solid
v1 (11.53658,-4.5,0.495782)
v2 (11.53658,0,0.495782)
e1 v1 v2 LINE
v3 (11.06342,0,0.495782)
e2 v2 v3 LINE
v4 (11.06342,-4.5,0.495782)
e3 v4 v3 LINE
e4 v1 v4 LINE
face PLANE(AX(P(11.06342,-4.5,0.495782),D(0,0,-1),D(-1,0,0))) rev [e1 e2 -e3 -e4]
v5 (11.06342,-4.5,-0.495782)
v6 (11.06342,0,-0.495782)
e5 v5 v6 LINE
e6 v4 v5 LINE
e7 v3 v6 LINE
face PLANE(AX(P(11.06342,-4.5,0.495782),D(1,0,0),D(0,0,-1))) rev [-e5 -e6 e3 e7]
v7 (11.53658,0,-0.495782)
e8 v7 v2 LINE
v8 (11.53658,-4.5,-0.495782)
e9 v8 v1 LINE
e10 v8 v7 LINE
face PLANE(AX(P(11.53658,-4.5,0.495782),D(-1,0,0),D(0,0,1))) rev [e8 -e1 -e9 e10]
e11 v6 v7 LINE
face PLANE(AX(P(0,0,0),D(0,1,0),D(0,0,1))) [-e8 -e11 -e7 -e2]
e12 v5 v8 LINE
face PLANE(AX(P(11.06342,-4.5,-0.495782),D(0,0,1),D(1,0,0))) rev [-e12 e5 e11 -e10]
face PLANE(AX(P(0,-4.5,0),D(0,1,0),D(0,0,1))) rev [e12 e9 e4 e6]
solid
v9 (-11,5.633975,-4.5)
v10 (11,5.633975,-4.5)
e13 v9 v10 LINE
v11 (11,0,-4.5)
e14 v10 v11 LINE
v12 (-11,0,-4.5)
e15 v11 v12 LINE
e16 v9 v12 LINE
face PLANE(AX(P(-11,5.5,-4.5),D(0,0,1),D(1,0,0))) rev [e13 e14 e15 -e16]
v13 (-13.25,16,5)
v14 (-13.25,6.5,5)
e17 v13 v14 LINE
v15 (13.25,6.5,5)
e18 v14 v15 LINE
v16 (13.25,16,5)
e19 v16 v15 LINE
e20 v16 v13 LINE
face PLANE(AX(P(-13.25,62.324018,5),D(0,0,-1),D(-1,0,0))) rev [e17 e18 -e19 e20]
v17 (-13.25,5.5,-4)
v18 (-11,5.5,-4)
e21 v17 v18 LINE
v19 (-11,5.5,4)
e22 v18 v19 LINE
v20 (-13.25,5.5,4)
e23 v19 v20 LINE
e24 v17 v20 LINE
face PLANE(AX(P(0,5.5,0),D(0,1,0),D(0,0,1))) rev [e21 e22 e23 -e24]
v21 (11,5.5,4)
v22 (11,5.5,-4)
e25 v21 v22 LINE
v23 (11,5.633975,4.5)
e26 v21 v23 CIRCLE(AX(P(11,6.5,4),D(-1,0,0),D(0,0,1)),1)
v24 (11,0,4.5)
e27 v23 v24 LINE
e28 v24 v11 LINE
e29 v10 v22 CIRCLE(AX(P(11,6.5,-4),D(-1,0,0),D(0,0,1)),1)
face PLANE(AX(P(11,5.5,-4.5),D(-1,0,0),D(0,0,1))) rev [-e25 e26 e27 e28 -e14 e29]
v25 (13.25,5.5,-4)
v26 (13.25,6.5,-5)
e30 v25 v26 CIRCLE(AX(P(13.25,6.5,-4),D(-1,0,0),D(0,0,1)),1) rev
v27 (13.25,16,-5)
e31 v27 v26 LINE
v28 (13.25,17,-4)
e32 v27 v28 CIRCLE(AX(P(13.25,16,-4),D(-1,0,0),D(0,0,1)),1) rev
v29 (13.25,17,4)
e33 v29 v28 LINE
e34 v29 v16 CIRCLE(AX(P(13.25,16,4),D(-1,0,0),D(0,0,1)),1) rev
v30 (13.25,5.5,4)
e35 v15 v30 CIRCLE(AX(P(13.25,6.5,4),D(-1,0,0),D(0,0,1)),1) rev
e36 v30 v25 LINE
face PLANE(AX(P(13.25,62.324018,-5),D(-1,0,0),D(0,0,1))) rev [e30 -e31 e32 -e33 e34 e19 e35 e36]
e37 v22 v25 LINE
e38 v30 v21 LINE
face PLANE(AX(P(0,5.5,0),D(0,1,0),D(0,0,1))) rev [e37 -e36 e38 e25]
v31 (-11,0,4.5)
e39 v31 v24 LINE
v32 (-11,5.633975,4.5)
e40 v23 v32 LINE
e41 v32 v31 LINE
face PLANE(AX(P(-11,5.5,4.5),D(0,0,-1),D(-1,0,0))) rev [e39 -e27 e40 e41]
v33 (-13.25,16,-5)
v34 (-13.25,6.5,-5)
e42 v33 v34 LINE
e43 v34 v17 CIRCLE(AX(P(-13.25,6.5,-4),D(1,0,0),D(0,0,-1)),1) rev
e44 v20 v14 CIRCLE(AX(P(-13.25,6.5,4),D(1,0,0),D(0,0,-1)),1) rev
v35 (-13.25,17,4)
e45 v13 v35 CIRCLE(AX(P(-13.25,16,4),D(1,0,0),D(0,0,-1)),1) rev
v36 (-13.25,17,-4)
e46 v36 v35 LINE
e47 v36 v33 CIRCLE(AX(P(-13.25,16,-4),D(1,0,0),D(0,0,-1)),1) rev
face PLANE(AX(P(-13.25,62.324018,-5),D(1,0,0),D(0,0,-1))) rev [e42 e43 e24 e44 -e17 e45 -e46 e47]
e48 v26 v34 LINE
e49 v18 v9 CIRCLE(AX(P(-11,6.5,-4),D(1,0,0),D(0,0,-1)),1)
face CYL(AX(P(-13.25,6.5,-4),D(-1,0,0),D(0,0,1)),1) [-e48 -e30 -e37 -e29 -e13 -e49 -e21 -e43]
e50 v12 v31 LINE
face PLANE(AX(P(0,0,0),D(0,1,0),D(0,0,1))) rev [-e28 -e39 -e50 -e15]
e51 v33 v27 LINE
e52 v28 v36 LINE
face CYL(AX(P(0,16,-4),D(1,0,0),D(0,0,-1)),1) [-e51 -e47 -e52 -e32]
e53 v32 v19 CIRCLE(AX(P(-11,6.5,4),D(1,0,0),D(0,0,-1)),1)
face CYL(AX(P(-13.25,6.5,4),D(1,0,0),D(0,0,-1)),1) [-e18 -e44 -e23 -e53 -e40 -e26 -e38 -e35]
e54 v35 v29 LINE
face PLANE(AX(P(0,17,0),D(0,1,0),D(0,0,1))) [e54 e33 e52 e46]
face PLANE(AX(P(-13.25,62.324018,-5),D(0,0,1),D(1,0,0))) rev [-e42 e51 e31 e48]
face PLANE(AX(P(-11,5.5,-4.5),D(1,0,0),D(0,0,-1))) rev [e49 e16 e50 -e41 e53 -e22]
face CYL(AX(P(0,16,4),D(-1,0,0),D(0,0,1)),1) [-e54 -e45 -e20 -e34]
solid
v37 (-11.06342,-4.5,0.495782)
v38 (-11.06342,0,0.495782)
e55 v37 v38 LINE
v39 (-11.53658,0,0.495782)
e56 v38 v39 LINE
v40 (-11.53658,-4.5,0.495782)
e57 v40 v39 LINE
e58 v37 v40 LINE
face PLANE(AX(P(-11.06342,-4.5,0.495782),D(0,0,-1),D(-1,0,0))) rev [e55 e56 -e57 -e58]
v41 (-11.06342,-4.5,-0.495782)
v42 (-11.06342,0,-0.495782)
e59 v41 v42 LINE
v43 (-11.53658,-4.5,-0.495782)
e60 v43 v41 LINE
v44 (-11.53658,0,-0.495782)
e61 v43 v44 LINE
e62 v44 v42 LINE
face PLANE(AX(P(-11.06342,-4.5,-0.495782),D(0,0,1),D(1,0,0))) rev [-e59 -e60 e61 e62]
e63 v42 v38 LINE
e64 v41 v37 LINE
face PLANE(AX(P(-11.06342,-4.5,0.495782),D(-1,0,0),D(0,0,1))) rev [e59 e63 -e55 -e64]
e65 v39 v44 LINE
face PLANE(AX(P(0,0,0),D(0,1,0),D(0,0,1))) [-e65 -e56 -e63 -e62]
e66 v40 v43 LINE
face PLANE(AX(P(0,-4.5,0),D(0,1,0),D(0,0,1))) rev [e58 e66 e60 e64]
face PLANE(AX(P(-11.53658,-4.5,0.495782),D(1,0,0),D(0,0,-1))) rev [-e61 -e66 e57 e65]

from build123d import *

# Parameters (mm, degrees)
SKETCH_1_W        = 22
SKETCH_1_H        = 9
EXTRUDE_1_DEPTH   = 5.5
SKETCH_2_W        = 26.5
SKETCH_2_H        = 10
EXTRUDE_2_DEPTH   = 11.5
SKETCH_3_W        = 0.473160644
SKETCH_3_H        = 0.99156312
EXTRUDE_3_DEPTH   = 4.5
EXTRUDE_3_2_DEPTH = 4.5
FILLET_1_R        = 1


with BuildPart() as part:
    # 草图1 → 凸台-拉伸1 (new body)
    with BuildSketch(Plane(origin=(0, 0, 0), x_dir=(1, 0, 0), z_dir=(0, 1, 0))):
        Rectangle(SKETCH_1_W, SKETCH_1_H)
    extrude(amount=EXTRUDE_1_DEPTH)

    # 草图2 → 凸台-拉伸2 (add)
    with BuildSketch(Plane(origin=(0, 5.5, 0), x_dir=(1, 0, 0), z_dir=(0, 1, 0))):
        Rectangle(SKETCH_2_W, SKETCH_2_H)
    extrude(amount=EXTRUDE_2_DEPTH)

    # 圆角1
    # the kernel refuses this fillet: 1 mm, written as the material it takes off along each edge
    with BuildSketch(Plane(origin=(15.75, 5.5, 5), x_dir=(0, 0, -1), z_dir=(-1, 0, 0))) as fillet_1_piece_1_section:
        with BuildLine():
            CenterArc((FILLET_1_R, -FILLET_1_R), FILLET_1_R, 90, 90)
            Line((0, -FILLET_1_R), (0, 0))
            Line((0, 0), (FILLET_1_R, 0))
        make_face()
    fillet_1_piece_1 = extrude(amount=31.5, mode=Mode.PRIVATE)
    fillet_1_piece_1 = split(fillet_1_piece_1, bisect_by=Plane(origin=(11, 5.524008382, 4.336749215), z_dir=(1, 0, 0)), keep=Keep.TOP, mode=Mode.PRIVATE)
    fillet_1_piece_1 = split(fillet_1_piece_1, bisect_by=Plane(origin=(13.375, 5.524008382, 4.5), z_dir=(0, 0, -1)), keep=Keep.TOP, mode=Mode.PRIVATE)
    add(fillet_1_piece_1, mode=Mode.SUBTRACT)
    with BuildSketch(Plane(origin=(15.75, 5.5, 5), x_dir=(0, 0, -1), z_dir=(-1, 0, 0))) as fillet_1_piece_2_section:
        with BuildLine():
            CenterArc((FILLET_1_R, -FILLET_1_R), FILLET_1_R, 90, 90)
            Line((0, -FILLET_1_R), (0, 0))
            Line((0, 0), (FILLET_1_R, 0))
        make_face()
    fillet_1_piece_2 = extrude(amount=31.5, mode=Mode.PRIVATE)
    fillet_1_piece_2 = split(fillet_1_piece_2, bisect_by=Plane(origin=(11, 5.75512006, 4.835608236), z_dir=(1, 0, 0)), keep=Keep.TOP, mode=Mode.PRIVATE)
    fillet_1_piece_2 = split(fillet_1_piece_2, bisect_by=Plane(origin=(13.375, 5.75512006, 4.5), z_dir=(0, 0, 1)), keep=Keep.TOP, mode=Mode.PRIVATE)
    add(fillet_1_piece_2, mode=Mode.SUBTRACT)
    with BuildSketch(Plane(origin=(15.75, 5.5, 5), x_dir=(0, 0, -1), z_dir=(-1, 0, 0))) as fillet_1_piece_3_section:
        with BuildLine():
            CenterArc((FILLET_1_R, -FILLET_1_R), FILLET_1_R, 90, 90)
            Line((0, -FILLET_1_R), (0, 0))
            Line((0, 0), (FILLET_1_R, 0))
        make_face()
    fillet_1_piece_3 = extrude(amount=31.5, mode=Mode.PRIVATE)
    fillet_1_piece_3 = split(fillet_1_piece_3, bisect_by=Plane(origin=(11, 5.75512006, 4.835608236), z_dir=(-1, 0, 0)), keep=Keep.TOP, mode=Mode.PRIVATE)
    fillet_1_piece_3 = split(fillet_1_piece_3, bisect_by=Plane(origin=(0, 5.75512006, 4.5), z_dir=(0, 0, 1)), keep=Keep.TOP, mode=Mode.PRIVATE)
    fillet_1_piece_3 = split(fillet_1_piece_3, bisect_by=Plane(origin=(-11, 5.75512006, 4.835608236), z_dir=(1, 0, 0)), keep=Keep.TOP, mode=Mode.PRIVATE)
    add(fillet_1_piece_3, mode=Mode.SUBTRACT)
    with BuildSketch(Plane(origin=(15.75, 5.5, 5), x_dir=(0, 0, -1), z_dir=(-1, 0, 0))) as fillet_1_piece_4_section:
        with BuildLine():
            CenterArc((FILLET_1_R, -FILLET_1_R), FILLET_1_R, 90, 90)
            Line((0, -FILLET_1_R), (0, 0))
            Line((0, 0), (FILLET_1_R, 0))
        make_face()
    fillet_1_piece_4 = extrude(amount=31.5, mode=Mode.PRIVATE)
    fillet_1_piece_4 = split(fillet_1_piece_4, bisect_by=Plane(origin=(-13.375, 5.524008382, 4.5), z_dir=(0, 0, -1)), keep=Keep.TOP, mode=Mode.PRIVATE)
    fillet_1_piece_4 = split(fillet_1_piece_4, bisect_by=Plane(origin=(-11, 5.524008382, 4.336749215), z_dir=(-1, 0, 0)), keep=Keep.TOP, mode=Mode.PRIVATE)
    add(fillet_1_piece_4, mode=Mode.SUBTRACT)
    with BuildSketch(Plane(origin=(15.75, 5.5, 5), x_dir=(0, 0, -1), z_dir=(-1, 0, 0))) as fillet_1_piece_5_section:
        with BuildLine():
            CenterArc((FILLET_1_R, -FILLET_1_R), FILLET_1_R, 90, 90)
            Line((0, -FILLET_1_R), (0, 0))
            Line((0, 0), (FILLET_1_R, 0))
        make_face()
    fillet_1_piece_5 = extrude(amount=31.5, mode=Mode.PRIVATE)
    fillet_1_piece_5 = split(fillet_1_piece_5, bisect_by=Plane(origin=(-13.375, 5.75512006, 4.5), z_dir=(0, 0, 1)), keep=Keep.TOP, mode=Mode.PRIVATE)
    fillet_1_piece_5 = split(fillet_1_piece_5, bisect_by=Plane(origin=(-11, 5.75512006, 4.835608236), z_dir=(-1, 0, 0)), keep=Keep.TOP, mode=Mode.PRIVATE)
    add(fillet_1_piece_5, mode=Mode.SUBTRACT)
    with BuildSketch(Plane(origin=(-15.75, 5.5, -5), x_dir=(0, 1, 0), z_dir=(1, 0, 0))) as fillet_1_piece_6_section:
        with BuildLine():
            CenterArc((FILLET_1_R, FILLET_1_R), FILLET_1_R, 180, 90)
            Line((0, FILLET_1_R), (0, 0))
            Line((0, 0), (FILLET_1_R, 0))
        make_face()
    fillet_1_piece_6 = extrude(amount=31.5, mode=Mode.PRIVATE)
    fillet_1_piece_6 = split(fillet_1_piece_6, bisect_by=Plane(origin=(-13.375, 5.75512006, -4.5), z_dir=(0, 0, -1)), keep=Keep.TOP, mode=Mode.PRIVATE)
    fillet_1_piece_6 = split(fillet_1_piece_6, bisect_by=Plane(origin=(-11, 5.75512006, -4.835608236), z_dir=(-1, 0, 0)), keep=Keep.TOP, mode=Mode.PRIVATE)
    add(fillet_1_piece_6, mode=Mode.SUBTRACT)
    with BuildSketch(Plane(origin=(-15.75, 5.5, -5), x_dir=(0, 1, 0), z_dir=(1, 0, 0))) as fillet_1_piece_7_section:
        with BuildLine():
            CenterArc((FILLET_1_R, FILLET_1_R), FILLET_1_R, 180, 90)
            Line((0, FILLET_1_R), (0, 0))
            Line((0, 0), (FILLET_1_R, 0))
        make_face()
    fillet_1_piece_7 = extrude(amount=31.5, mode=Mode.PRIVATE)
    fillet_1_piece_7 = split(fillet_1_piece_7, bisect_by=Plane(origin=(-13.375, 5.524008382, -4.5), z_dir=(0, 0, 1)), keep=Keep.TOP, mode=Mode.PRIVATE)
    fillet_1_piece_7 = split(fillet_1_piece_7, bisect_by=Plane(origin=(-11, 5.524008382, -4.336749215), z_dir=(-1, 0, 0)), keep=Keep.TOP, mode=Mode.PRIVATE)
    add(fillet_1_piece_7, mode=Mode.SUBTRACT)
    with BuildSketch(Plane(origin=(-15.75, 5.5, -5), x_dir=(0, 1, 0), z_dir=(1, 0, 0))) as fillet_1_piece_8_section:
        with BuildLine():
            CenterArc((FILLET_1_R, FILLET_1_R), FILLET_1_R, 180, 90)
            Line((0, FILLET_1_R), (0, 0))
            Line((0, 0), (FILLET_1_R, 0))
        make_face()
    fillet_1_piece_8 = extrude(amount=31.5, mode=Mode.PRIVATE)
    fillet_1_piece_8 = split(fillet_1_piece_8, bisect_by=Plane(origin=(0, 5.75512006, -4.5), z_dir=(0, 0, -1)), keep=Keep.TOP, mode=Mode.PRIVATE)
    fillet_1_piece_8 = split(fillet_1_piece_8, bisect_by=Plane(origin=(11, 5.75512006, -4.835608236), z_dir=(-1, 0, 0)), keep=Keep.TOP, mode=Mode.PRIVATE)
    fillet_1_piece_8 = split(fillet_1_piece_8, bisect_by=Plane(origin=(-11, 5.75512006, -4.835608236), z_dir=(1, 0, 0)), keep=Keep.TOP, mode=Mode.PRIVATE)
    add(fillet_1_piece_8, mode=Mode.SUBTRACT)
    with BuildSketch(Plane(origin=(-15.75, 5.5, -5), x_dir=(0, 1, 0), z_dir=(1, 0, 0))) as fillet_1_piece_9_section:
        with BuildLine():
            CenterArc((FILLET_1_R, FILLET_1_R), FILLET_1_R, 180, 90)
            Line((0, FILLET_1_R), (0, 0))
            Line((0, 0), (FILLET_1_R, 0))
        make_face()
    fillet_1_piece_9 = extrude(amount=31.5, mode=Mode.PRIVATE)
    fillet_1_piece_9 = split(fillet_1_piece_9, bisect_by=Plane(origin=(13.375, 5.75512006, -4.5), z_dir=(0, 0, -1)), keep=Keep.TOP, mode=Mode.PRIVATE)
    fillet_1_piece_9 = split(fillet_1_piece_9, bisect_by=Plane(origin=(11, 5.75512006, -4.835608236), z_dir=(1, 0, 0)), keep=Keep.TOP, mode=Mode.PRIVATE)
    add(fillet_1_piece_9, mode=Mode.SUBTRACT)
    with BuildSketch(Plane(origin=(-15.75, 5.5, -5), x_dir=(0, 1, 0), z_dir=(1, 0, 0))) as fillet_1_piece_10_section:
        with BuildLine():
            CenterArc((FILLET_1_R, FILLET_1_R), FILLET_1_R, 180, 90)
            Line((0, FILLET_1_R), (0, 0))
            Line((0, 0), (FILLET_1_R, 0))
        make_face()
    fillet_1_piece_10 = extrude(amount=31.5, mode=Mode.PRIVATE)
    fillet_1_piece_10 = split(fillet_1_piece_10, bisect_by=Plane(origin=(13.375, 5.524008382, -4.5), z_dir=(0, 0, 1)), keep=Keep.TOP, mode=Mode.PRIVATE)
    fillet_1_piece_10 = split(fillet_1_piece_10, bisect_by=Plane(origin=(11, 5.524008382, -4.336749215), z_dir=(1, 0, 0)), keep=Keep.TOP, mode=Mode.PRIVATE)
    add(fillet_1_piece_10, mode=Mode.SUBTRACT)
    with BuildSketch(Plane(origin=(-15.75, 17, -5), x_dir=(0, -1, 0), z_dir=(1, 0, 0))) as fillet_1_piece_11:
        with BuildLine():
            CenterArc((FILLET_1_R, -FILLET_1_R), FILLET_1_R, 90, 90)
            Line((0, -FILLET_1_R), (0, 0))
            Line((0, 0), (FILLET_1_R, 0))
        make_face()
    extrude(amount=31.5, mode=Mode.SUBTRACT)
    with BuildSketch(Plane(origin=(15.75, 17, 5), x_dir=(0, 0, -1), z_dir=(-1, 0, 0))) as fillet_1_piece_12:
        with BuildLine():
            CenterArc((FILLET_1_R, FILLET_1_R), FILLET_1_R, 180, 90)
            Line((0, FILLET_1_R), (0, 0))
            Line((0, 0), (FILLET_1_R, 0))
        make_face()
    extrude(amount=31.5, mode=Mode.SUBTRACT)


with BuildPart() as body_2:
    # 草图3 → 凸台-拉伸3 (new body)
    with BuildSketch(Plane.XZ):
        with Locations((-11.3, 0)):
            Rectangle(SKETCH_3_W, SKETCH_3_H)
    extrude(amount=EXTRUDE_3_DEPTH)


with BuildPart() as body_3:
    # 草图3 → Extrude 3 2 (new body)
    with BuildSketch(Plane.XZ):
        with Locations((11.3, 0)):
            Rectangle(SKETCH_3_W, SKETCH_3_H)
    extrude(amount=EXTRUDE_3_2_DEPTH)


solid = Compound([part.part, body_2.part, body_3.part])
